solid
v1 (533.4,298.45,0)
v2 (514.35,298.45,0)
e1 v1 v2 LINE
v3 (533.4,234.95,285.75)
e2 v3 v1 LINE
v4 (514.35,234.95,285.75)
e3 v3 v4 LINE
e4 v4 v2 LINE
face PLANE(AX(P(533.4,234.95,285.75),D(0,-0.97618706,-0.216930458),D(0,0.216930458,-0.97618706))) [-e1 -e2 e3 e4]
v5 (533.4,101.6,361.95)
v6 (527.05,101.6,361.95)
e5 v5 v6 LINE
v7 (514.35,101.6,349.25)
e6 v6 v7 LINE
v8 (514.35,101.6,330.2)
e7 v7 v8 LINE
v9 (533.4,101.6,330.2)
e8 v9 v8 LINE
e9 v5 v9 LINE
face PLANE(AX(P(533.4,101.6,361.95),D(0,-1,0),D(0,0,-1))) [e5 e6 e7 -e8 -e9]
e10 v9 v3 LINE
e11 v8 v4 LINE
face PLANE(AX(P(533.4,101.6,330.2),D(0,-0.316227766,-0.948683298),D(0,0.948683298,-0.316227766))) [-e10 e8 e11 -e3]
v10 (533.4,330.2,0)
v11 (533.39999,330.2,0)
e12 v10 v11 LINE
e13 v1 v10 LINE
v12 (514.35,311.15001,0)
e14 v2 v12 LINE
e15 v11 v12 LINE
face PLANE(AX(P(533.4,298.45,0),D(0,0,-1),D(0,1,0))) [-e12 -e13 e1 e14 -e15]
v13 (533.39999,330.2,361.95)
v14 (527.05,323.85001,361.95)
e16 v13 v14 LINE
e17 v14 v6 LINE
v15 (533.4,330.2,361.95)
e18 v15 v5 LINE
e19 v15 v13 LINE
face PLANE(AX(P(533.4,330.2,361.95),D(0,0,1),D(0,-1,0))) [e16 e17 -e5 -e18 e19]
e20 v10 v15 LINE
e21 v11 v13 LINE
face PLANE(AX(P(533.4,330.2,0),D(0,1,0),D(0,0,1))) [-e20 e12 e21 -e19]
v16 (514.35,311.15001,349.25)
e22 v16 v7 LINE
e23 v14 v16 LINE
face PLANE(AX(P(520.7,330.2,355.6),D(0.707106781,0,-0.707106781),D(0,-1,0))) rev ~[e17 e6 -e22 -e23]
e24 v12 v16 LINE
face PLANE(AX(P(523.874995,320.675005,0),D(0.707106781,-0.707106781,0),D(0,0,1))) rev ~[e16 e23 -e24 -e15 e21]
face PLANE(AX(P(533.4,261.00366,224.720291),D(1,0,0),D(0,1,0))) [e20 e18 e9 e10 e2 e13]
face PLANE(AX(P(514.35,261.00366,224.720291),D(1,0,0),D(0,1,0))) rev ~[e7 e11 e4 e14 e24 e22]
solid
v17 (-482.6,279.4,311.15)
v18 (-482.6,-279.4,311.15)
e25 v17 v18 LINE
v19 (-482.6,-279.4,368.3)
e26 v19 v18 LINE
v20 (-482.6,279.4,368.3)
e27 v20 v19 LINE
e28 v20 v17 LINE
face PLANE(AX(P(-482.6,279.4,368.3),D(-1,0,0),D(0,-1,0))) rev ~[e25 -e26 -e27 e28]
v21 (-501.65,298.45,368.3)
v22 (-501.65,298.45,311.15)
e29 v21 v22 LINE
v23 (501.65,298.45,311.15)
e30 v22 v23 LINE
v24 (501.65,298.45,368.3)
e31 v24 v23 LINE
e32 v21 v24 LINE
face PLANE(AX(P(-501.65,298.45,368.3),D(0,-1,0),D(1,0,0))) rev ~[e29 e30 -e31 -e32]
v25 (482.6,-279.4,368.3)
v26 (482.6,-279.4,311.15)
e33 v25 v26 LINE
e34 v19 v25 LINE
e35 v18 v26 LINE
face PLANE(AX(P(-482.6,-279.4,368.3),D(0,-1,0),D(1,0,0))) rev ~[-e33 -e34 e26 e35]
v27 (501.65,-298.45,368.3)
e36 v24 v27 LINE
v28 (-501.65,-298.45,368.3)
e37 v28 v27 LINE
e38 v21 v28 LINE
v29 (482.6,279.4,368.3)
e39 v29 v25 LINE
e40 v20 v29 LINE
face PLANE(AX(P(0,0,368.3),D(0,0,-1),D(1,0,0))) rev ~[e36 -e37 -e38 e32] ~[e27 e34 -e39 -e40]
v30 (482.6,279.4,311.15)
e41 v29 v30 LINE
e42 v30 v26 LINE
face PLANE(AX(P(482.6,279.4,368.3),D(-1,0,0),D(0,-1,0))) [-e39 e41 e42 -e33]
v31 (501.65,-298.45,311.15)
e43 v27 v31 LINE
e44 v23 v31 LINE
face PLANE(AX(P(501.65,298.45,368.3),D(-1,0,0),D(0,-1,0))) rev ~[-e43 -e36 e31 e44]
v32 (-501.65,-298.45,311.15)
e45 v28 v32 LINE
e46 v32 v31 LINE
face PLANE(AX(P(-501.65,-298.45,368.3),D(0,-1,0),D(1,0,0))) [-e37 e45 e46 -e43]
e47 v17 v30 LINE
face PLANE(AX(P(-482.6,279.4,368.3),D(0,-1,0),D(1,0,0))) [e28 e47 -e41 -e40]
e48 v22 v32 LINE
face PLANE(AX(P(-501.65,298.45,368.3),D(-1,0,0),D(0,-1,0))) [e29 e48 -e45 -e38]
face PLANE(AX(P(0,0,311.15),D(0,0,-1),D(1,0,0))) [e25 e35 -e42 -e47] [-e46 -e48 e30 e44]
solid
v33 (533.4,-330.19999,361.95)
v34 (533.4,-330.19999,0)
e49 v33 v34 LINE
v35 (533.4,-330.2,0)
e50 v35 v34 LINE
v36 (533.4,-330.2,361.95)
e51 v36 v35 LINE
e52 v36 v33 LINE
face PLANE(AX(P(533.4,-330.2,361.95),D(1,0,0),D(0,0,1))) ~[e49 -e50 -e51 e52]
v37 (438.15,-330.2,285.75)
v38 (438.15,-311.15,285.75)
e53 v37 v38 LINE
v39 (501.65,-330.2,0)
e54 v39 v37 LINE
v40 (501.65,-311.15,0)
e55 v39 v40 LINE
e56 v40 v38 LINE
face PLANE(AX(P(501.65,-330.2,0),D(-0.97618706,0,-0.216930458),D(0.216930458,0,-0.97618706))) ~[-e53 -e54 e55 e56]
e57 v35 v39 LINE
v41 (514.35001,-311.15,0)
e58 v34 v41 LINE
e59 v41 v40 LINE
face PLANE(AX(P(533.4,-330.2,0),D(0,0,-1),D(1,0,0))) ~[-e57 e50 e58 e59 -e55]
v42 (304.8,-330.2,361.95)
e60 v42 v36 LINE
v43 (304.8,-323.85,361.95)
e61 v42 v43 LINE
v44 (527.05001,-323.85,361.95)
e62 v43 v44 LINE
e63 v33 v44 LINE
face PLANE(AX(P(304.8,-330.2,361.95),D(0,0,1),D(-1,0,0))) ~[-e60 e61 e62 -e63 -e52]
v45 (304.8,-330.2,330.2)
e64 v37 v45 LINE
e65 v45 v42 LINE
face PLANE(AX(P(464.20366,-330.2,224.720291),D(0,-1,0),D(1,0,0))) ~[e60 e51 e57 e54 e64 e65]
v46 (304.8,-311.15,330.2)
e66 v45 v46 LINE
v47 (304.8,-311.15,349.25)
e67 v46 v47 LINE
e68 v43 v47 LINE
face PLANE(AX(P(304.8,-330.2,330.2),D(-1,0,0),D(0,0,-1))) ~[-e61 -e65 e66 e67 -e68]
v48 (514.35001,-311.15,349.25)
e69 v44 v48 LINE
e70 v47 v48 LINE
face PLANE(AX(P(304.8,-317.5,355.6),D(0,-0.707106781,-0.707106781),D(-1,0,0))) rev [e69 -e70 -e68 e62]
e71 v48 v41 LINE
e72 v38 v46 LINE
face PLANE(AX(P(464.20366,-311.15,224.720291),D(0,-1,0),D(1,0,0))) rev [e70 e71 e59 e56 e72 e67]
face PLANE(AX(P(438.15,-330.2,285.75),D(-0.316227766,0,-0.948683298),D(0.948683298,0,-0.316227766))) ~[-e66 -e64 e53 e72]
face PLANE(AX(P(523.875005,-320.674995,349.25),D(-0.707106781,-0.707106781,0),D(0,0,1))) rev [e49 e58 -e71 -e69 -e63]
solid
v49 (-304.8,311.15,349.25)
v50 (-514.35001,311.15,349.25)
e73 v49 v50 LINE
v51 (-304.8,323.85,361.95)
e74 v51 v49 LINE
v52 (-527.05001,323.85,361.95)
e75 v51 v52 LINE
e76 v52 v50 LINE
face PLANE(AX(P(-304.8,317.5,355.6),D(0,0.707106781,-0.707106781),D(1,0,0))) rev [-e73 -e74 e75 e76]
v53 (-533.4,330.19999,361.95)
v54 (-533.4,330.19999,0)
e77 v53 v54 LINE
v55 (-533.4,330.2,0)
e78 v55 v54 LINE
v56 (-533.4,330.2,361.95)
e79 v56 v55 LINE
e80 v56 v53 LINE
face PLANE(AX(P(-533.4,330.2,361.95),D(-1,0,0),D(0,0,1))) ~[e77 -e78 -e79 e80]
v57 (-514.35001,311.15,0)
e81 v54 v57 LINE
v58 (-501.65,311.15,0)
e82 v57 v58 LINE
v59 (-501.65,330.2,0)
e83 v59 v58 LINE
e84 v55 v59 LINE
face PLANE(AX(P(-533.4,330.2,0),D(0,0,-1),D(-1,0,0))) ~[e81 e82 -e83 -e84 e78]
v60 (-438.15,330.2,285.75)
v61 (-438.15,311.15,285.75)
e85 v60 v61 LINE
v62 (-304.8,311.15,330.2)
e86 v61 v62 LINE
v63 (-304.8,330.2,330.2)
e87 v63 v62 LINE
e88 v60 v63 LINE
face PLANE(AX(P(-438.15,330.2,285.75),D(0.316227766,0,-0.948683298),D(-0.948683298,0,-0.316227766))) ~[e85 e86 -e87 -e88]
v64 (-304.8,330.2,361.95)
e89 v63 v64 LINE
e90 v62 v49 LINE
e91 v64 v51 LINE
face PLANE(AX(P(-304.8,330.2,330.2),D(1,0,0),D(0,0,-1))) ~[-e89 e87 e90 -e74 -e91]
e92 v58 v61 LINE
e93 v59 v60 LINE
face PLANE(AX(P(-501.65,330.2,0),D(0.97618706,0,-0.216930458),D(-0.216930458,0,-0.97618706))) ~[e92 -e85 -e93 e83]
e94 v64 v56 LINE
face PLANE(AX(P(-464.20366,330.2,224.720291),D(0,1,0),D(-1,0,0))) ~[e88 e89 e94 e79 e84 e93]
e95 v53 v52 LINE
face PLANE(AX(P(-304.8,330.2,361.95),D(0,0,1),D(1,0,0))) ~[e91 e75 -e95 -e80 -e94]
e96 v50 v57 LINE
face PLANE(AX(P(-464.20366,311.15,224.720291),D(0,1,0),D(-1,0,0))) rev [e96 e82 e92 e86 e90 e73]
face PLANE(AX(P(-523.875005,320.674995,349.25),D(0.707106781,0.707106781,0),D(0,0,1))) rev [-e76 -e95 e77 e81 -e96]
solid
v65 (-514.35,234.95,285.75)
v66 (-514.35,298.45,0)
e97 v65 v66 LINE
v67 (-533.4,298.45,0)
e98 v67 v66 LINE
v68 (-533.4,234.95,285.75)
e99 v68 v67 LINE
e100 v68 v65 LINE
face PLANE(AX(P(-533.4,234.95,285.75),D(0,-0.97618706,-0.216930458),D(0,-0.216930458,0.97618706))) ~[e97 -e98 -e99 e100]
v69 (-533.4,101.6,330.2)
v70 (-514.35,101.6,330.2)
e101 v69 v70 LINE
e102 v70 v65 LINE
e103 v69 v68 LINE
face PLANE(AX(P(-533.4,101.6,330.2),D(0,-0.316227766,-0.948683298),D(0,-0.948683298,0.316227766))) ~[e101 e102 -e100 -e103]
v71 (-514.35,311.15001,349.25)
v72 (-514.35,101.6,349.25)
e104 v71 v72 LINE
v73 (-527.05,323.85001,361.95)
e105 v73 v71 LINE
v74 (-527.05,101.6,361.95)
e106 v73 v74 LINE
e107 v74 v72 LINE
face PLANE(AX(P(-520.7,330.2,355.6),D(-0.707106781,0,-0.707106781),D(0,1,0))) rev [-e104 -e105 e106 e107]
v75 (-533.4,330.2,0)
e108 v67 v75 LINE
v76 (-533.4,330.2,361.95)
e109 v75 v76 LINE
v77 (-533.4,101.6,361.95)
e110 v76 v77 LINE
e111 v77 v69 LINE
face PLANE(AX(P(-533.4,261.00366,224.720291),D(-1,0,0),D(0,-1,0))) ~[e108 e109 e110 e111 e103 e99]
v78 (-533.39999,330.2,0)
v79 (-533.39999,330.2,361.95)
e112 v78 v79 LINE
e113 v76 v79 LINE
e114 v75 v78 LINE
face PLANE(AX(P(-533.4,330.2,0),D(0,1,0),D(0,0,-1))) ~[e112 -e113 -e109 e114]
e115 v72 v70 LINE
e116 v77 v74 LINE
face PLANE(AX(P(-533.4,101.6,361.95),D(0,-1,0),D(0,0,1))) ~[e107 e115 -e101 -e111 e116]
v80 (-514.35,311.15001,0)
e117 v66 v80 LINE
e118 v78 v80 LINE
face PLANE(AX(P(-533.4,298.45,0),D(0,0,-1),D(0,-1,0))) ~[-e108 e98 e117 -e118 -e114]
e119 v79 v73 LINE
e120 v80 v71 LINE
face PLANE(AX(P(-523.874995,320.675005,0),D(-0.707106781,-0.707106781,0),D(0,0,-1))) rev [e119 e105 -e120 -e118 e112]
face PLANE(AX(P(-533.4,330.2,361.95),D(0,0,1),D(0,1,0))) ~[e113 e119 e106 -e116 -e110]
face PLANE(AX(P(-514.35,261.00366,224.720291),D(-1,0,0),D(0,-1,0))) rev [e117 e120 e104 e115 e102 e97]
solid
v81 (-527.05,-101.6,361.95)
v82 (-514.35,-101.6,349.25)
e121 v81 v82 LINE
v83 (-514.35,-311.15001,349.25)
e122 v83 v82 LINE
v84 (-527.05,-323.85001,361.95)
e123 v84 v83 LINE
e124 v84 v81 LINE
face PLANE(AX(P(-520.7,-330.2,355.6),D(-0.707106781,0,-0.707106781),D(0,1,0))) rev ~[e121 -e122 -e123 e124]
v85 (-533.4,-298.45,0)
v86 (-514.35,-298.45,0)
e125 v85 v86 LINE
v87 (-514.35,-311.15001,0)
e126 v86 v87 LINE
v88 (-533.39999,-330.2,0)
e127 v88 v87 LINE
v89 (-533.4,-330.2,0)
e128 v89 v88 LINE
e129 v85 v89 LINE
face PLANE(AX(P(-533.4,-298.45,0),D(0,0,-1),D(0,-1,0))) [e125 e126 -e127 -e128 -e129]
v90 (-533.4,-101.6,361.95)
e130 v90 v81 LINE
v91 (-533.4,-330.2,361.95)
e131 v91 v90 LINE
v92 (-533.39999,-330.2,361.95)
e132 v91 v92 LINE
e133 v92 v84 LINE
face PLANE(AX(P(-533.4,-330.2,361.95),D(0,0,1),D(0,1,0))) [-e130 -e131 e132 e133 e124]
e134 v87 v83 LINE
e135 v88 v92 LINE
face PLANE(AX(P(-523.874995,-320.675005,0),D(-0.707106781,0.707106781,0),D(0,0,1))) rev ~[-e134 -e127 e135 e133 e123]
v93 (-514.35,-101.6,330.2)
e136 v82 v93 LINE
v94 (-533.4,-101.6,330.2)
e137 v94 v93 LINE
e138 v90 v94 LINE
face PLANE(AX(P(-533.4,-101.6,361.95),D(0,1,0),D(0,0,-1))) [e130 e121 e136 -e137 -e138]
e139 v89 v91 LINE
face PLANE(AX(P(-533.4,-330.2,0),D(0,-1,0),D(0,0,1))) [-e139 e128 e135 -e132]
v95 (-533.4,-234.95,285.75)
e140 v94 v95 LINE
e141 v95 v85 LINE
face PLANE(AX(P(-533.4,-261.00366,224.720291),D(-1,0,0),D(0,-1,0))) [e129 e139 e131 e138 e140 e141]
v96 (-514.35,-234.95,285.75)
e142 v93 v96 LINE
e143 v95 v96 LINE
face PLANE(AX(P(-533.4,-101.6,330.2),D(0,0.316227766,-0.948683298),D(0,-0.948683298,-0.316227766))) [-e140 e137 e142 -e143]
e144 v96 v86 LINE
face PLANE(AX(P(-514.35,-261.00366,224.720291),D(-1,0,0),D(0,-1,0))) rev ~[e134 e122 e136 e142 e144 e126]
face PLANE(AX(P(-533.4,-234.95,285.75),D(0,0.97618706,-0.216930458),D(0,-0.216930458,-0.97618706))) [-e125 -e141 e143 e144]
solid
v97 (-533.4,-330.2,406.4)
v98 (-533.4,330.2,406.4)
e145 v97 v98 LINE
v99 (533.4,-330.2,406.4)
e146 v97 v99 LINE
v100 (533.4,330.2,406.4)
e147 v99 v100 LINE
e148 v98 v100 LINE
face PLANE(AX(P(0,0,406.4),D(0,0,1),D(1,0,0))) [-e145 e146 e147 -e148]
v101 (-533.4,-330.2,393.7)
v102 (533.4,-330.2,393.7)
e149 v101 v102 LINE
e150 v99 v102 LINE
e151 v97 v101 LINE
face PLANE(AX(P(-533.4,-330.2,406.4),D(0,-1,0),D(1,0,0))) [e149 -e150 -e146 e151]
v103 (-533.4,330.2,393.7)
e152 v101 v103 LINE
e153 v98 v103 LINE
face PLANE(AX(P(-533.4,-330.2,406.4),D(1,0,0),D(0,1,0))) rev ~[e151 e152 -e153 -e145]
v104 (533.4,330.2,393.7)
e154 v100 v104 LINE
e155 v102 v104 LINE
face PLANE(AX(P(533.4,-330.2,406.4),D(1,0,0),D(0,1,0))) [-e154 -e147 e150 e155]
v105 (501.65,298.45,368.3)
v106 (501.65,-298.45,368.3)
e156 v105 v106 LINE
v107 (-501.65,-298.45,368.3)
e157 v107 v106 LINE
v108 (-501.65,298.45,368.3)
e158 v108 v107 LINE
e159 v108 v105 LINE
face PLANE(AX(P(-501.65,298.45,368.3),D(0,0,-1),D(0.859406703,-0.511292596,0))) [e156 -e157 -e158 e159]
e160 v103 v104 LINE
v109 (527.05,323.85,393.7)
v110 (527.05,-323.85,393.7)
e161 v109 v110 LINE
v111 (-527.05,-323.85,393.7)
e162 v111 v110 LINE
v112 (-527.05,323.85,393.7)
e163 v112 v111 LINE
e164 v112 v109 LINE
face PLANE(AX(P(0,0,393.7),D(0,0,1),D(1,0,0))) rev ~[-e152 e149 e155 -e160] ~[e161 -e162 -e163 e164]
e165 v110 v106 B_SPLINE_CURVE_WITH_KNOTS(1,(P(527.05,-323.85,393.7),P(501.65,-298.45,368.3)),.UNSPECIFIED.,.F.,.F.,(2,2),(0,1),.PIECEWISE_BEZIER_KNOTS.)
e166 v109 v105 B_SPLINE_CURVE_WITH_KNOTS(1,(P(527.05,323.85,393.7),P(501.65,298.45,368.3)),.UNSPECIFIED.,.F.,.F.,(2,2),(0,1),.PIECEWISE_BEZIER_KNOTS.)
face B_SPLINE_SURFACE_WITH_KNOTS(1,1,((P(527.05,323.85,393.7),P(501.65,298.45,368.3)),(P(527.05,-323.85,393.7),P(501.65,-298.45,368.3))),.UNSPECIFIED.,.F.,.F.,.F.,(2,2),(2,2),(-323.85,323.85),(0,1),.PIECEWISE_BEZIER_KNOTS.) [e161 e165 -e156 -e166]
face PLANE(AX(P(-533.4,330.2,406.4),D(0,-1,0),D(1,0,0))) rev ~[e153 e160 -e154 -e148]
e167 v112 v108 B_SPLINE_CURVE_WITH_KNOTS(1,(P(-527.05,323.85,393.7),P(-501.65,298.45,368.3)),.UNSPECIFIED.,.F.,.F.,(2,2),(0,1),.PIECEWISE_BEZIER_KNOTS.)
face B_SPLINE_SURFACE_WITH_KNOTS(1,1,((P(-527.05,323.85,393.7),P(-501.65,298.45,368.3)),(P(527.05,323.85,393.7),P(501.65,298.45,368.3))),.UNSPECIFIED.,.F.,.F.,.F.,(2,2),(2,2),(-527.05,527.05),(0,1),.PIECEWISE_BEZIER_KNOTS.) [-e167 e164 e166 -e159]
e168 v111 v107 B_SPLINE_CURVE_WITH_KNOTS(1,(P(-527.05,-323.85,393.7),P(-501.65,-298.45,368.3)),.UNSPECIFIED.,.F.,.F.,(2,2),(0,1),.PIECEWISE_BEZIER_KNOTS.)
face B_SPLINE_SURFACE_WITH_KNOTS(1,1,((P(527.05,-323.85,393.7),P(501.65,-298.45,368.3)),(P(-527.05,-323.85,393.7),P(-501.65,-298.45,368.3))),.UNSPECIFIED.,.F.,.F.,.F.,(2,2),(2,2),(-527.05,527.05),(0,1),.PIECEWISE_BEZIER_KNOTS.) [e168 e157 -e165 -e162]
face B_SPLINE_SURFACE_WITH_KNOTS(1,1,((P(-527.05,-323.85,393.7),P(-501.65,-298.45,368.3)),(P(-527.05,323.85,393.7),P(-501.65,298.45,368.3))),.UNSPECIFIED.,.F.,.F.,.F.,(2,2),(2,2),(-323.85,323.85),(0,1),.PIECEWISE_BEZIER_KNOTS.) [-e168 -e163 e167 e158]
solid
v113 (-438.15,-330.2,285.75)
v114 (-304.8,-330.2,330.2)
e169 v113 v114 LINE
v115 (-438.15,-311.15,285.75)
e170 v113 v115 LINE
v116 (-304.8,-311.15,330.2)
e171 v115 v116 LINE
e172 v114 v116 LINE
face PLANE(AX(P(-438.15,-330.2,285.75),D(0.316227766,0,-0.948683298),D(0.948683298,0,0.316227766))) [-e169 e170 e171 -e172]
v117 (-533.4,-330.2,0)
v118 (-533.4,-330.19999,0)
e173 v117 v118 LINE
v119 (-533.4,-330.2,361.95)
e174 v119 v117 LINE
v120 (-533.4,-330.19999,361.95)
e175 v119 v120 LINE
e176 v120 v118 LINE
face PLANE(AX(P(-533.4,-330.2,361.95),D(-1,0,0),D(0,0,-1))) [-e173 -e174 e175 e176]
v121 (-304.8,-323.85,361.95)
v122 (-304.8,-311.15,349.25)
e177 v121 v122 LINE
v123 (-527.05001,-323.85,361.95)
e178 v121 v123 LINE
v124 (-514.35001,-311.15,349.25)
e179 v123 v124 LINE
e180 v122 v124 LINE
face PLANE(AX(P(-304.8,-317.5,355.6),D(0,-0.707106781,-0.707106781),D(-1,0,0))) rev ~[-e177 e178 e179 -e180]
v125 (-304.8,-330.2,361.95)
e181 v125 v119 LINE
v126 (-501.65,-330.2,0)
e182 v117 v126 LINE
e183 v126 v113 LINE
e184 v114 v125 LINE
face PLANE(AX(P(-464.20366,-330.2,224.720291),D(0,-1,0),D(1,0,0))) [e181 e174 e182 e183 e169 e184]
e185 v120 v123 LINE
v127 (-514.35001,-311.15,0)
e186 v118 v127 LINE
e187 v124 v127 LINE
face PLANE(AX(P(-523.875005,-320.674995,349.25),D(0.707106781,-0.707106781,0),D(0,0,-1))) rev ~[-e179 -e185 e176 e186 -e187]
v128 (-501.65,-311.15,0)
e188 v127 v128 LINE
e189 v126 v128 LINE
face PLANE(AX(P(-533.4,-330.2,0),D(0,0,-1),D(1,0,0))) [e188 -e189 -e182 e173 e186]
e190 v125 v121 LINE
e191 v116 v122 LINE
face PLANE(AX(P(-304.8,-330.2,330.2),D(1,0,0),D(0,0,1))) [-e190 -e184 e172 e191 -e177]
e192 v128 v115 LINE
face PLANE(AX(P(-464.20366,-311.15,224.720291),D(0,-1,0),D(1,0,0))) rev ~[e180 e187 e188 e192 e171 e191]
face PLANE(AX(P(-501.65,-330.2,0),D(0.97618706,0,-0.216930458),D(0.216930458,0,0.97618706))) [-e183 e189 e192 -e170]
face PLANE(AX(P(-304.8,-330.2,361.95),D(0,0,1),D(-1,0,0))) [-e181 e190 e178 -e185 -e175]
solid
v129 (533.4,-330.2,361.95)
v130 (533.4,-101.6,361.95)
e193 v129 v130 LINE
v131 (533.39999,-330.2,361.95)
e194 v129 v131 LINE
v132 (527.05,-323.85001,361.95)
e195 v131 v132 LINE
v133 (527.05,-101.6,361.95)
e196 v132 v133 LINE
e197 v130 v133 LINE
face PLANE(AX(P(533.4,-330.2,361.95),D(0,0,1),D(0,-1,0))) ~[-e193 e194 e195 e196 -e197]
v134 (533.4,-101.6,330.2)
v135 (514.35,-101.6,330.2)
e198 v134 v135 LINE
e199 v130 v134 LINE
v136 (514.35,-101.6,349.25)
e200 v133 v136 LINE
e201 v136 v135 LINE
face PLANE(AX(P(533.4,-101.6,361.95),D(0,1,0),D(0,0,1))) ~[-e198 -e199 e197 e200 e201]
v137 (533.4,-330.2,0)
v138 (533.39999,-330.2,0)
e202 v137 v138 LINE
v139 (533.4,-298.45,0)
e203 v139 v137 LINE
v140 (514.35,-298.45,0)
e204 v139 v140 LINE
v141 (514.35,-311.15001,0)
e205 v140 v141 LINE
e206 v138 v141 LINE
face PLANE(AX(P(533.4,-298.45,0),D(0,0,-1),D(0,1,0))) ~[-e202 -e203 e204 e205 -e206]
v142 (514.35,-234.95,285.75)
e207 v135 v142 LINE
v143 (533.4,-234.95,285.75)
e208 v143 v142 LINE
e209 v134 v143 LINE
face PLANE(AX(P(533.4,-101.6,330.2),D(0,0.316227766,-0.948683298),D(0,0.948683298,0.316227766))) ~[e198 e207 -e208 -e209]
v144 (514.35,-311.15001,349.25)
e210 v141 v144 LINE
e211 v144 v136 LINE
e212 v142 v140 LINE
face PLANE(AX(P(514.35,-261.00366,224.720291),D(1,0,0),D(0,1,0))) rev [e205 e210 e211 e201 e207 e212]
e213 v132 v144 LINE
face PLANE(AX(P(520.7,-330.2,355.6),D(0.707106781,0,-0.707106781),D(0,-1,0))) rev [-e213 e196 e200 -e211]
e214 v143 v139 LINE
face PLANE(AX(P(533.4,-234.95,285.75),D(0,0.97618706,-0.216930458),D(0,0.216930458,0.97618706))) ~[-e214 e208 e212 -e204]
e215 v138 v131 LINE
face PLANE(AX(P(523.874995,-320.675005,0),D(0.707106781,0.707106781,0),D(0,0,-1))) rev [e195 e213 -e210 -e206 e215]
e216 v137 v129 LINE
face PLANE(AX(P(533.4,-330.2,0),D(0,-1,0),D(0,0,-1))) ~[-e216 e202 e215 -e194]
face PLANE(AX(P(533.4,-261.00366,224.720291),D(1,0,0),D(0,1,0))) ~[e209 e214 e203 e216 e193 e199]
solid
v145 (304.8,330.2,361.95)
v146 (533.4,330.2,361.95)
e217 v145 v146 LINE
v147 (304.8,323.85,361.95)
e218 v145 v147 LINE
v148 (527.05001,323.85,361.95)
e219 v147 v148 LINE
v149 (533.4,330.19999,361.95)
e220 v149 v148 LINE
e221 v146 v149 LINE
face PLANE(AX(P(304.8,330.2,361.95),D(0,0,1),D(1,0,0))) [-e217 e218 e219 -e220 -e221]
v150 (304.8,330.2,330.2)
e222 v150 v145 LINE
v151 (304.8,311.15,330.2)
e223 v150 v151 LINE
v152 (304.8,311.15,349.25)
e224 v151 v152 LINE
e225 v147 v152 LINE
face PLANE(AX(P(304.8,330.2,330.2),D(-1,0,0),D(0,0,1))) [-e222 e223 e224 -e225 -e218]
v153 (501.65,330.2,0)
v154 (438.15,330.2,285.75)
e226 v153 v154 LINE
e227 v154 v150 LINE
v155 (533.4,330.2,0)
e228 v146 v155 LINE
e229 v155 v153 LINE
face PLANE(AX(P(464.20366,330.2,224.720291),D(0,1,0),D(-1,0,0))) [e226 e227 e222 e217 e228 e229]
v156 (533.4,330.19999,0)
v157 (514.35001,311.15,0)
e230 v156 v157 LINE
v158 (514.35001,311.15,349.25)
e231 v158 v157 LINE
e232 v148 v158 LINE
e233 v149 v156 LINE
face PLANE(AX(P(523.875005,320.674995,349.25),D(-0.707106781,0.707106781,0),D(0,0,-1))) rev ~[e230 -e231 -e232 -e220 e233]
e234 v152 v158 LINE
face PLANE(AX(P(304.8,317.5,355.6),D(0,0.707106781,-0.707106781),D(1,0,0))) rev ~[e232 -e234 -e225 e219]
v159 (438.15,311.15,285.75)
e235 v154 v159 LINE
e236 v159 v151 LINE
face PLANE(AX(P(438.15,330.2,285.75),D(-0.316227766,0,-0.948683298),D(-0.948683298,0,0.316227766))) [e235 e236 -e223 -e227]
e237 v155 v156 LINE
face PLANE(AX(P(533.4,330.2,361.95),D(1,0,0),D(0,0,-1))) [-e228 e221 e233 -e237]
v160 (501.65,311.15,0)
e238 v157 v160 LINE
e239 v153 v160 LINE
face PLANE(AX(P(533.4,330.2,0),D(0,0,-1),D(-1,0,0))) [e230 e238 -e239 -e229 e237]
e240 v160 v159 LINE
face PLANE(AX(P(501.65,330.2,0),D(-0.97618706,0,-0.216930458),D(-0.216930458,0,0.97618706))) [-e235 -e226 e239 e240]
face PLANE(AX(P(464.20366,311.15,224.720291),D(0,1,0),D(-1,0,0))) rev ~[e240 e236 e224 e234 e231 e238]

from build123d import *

# Parameters (mm, degrees)
F1_W      = 1066.8
F1_H      = 660.4
F2_DEPTH  = 12.7
F3_W      = 1054.1
F3_H      = 647.7
F4_DEPTH  = 25.4
F4_TAPER  = 45
F6_DEPTH  = 19.05
F7_SIZE   = 12.7
F8_SIZE   = 19.04999
F10_DEPTH = 19.05
F11_SIZE  = 12.7
F12_SIZE  = 19.04999
F15_W     = 1003.3
F15_H     = 596.9
F15_W_2   = 965.2
F15_H_2   = 558.8
F16_DEPTH = 57.15


# Not quite as in the source:
# - a fillet or chamfer is up to 0.001 mm smaller than in the source, because OpenCascade refuses the exact size


with BuildPart() as f2:
    # F1 (on offset) → F2 (new body)
    with BuildSketch(Plane.XY.offset(406.4)):
        Rectangle(F1_W, F1_H)
    extrude(amount=-F2_DEPTH)

    # F3 (on face) → F4 (join)
    with BuildSketch(Plane(origin=(0, 0, 393.7), x_dir=(1, 0, 0), z_dir=(0, 0, -1))):
        Rectangle(F3_W, F3_H)
    extrude(amount=F4_DEPTH, taper=F4_TAPER)


with BuildPart() as f6:
    # F5 (on face) → F6 (new body)
    with BuildSketch(Plane.XZ.offset(330.2)):
        Polygon((-304.8, 361.95), (-533.4, 361.95), (-533.4, 0), (-501.65, 0), (-438.15, 285.75), (-304.8, 330.2), align=None)
    extrude(amount=-F6_DEPTH)

    # F7
    f7_edges = [f6.edges().sort_by_distance(p)[0] for p in [
        (-419.1, -311.15, 361.95),
    ]]
    chamfer(f7_edges, length=F7_SIZE)

    # F8 (size 19.05 in the source; OpenCascade refuses exactly that, so slightly less here)
    f8_edges = [f6.edges().sort_by_distance(p)[0] for p in [
        (-533.4, -311.15, 174.625),
    ]]
    chamfer(f8_edges, length=F8_SIZE)


with BuildPart() as f10:
    # F9 (on face) → F10 (new body)
    with BuildSketch(Plane(origin=(-533.4, 0, 0), x_dir=(0, -1, 0), z_dir=(-1, 0, 0))):
        Polygon((234.95, 285.75), (298.45, 0), (330.2, 0), (330.2, 361.95), (101.6, 361.95), (101.6, 330.2), align=None)
    extrude(amount=-F10_DEPTH)

    # F11
    f11_edges = [f10.edges().sort_by_distance(p)[0] for p in [
        (-514.35, -215.9, 361.95),
    ]]
    chamfer(f11_edges, length=F11_SIZE)

    # F12 (size 19.05 in the source; OpenCascade refuses exactly that, so slightly less here)
    f12_edges = [f10.edges().sort_by_distance(p)[0] for p in [
        (-514.35, -330.2, 174.625),
    ]]
    chamfer(f12_edges, length=F12_SIZE)


with BuildPart() as f13_1:
    # F13: instance of F6
    add(f6.part.mirror(Plane.XZ))


with BuildPart() as f13_2:
    # F13: instance of F10
    add(f10.part.mirror(Plane.XZ))


with BuildPart() as f14_1:
    # F14: instance of F6
    add(f6.part.mirror(Plane.YZ))


with BuildPart() as f14_2:
    # F14: instance of F10
    add(f10.part.mirror(Plane.YZ))


with BuildPart() as f14_3:
    # F14: instance of F13_1
    add(f13_1.part.mirror(Plane.YZ))


with BuildPart() as f14_4:
    # F14: instance of F13_2
    add(f13_2.part.mirror(Plane.YZ))


with BuildPart() as f16:
    # F15 (on face) → F16 (new body)
    with BuildSketch(Plane(origin=(0, 0, 368.3), x_dir=(1, 0, 0), z_dir=(0, 0, -1))):
        Rectangle(F15_W, F15_H)
        Rectangle(F15_W_2, F15_H_2, mode=Mode.SUBTRACT)
    extrude(amount=F16_DEPTH)


solid = Compound([f2.part, f6.part, f10.part, f13_1.part, f13_2.part, f14_1.part, f14_2.part, f14_3.part, f14_4.part, f16.part])
